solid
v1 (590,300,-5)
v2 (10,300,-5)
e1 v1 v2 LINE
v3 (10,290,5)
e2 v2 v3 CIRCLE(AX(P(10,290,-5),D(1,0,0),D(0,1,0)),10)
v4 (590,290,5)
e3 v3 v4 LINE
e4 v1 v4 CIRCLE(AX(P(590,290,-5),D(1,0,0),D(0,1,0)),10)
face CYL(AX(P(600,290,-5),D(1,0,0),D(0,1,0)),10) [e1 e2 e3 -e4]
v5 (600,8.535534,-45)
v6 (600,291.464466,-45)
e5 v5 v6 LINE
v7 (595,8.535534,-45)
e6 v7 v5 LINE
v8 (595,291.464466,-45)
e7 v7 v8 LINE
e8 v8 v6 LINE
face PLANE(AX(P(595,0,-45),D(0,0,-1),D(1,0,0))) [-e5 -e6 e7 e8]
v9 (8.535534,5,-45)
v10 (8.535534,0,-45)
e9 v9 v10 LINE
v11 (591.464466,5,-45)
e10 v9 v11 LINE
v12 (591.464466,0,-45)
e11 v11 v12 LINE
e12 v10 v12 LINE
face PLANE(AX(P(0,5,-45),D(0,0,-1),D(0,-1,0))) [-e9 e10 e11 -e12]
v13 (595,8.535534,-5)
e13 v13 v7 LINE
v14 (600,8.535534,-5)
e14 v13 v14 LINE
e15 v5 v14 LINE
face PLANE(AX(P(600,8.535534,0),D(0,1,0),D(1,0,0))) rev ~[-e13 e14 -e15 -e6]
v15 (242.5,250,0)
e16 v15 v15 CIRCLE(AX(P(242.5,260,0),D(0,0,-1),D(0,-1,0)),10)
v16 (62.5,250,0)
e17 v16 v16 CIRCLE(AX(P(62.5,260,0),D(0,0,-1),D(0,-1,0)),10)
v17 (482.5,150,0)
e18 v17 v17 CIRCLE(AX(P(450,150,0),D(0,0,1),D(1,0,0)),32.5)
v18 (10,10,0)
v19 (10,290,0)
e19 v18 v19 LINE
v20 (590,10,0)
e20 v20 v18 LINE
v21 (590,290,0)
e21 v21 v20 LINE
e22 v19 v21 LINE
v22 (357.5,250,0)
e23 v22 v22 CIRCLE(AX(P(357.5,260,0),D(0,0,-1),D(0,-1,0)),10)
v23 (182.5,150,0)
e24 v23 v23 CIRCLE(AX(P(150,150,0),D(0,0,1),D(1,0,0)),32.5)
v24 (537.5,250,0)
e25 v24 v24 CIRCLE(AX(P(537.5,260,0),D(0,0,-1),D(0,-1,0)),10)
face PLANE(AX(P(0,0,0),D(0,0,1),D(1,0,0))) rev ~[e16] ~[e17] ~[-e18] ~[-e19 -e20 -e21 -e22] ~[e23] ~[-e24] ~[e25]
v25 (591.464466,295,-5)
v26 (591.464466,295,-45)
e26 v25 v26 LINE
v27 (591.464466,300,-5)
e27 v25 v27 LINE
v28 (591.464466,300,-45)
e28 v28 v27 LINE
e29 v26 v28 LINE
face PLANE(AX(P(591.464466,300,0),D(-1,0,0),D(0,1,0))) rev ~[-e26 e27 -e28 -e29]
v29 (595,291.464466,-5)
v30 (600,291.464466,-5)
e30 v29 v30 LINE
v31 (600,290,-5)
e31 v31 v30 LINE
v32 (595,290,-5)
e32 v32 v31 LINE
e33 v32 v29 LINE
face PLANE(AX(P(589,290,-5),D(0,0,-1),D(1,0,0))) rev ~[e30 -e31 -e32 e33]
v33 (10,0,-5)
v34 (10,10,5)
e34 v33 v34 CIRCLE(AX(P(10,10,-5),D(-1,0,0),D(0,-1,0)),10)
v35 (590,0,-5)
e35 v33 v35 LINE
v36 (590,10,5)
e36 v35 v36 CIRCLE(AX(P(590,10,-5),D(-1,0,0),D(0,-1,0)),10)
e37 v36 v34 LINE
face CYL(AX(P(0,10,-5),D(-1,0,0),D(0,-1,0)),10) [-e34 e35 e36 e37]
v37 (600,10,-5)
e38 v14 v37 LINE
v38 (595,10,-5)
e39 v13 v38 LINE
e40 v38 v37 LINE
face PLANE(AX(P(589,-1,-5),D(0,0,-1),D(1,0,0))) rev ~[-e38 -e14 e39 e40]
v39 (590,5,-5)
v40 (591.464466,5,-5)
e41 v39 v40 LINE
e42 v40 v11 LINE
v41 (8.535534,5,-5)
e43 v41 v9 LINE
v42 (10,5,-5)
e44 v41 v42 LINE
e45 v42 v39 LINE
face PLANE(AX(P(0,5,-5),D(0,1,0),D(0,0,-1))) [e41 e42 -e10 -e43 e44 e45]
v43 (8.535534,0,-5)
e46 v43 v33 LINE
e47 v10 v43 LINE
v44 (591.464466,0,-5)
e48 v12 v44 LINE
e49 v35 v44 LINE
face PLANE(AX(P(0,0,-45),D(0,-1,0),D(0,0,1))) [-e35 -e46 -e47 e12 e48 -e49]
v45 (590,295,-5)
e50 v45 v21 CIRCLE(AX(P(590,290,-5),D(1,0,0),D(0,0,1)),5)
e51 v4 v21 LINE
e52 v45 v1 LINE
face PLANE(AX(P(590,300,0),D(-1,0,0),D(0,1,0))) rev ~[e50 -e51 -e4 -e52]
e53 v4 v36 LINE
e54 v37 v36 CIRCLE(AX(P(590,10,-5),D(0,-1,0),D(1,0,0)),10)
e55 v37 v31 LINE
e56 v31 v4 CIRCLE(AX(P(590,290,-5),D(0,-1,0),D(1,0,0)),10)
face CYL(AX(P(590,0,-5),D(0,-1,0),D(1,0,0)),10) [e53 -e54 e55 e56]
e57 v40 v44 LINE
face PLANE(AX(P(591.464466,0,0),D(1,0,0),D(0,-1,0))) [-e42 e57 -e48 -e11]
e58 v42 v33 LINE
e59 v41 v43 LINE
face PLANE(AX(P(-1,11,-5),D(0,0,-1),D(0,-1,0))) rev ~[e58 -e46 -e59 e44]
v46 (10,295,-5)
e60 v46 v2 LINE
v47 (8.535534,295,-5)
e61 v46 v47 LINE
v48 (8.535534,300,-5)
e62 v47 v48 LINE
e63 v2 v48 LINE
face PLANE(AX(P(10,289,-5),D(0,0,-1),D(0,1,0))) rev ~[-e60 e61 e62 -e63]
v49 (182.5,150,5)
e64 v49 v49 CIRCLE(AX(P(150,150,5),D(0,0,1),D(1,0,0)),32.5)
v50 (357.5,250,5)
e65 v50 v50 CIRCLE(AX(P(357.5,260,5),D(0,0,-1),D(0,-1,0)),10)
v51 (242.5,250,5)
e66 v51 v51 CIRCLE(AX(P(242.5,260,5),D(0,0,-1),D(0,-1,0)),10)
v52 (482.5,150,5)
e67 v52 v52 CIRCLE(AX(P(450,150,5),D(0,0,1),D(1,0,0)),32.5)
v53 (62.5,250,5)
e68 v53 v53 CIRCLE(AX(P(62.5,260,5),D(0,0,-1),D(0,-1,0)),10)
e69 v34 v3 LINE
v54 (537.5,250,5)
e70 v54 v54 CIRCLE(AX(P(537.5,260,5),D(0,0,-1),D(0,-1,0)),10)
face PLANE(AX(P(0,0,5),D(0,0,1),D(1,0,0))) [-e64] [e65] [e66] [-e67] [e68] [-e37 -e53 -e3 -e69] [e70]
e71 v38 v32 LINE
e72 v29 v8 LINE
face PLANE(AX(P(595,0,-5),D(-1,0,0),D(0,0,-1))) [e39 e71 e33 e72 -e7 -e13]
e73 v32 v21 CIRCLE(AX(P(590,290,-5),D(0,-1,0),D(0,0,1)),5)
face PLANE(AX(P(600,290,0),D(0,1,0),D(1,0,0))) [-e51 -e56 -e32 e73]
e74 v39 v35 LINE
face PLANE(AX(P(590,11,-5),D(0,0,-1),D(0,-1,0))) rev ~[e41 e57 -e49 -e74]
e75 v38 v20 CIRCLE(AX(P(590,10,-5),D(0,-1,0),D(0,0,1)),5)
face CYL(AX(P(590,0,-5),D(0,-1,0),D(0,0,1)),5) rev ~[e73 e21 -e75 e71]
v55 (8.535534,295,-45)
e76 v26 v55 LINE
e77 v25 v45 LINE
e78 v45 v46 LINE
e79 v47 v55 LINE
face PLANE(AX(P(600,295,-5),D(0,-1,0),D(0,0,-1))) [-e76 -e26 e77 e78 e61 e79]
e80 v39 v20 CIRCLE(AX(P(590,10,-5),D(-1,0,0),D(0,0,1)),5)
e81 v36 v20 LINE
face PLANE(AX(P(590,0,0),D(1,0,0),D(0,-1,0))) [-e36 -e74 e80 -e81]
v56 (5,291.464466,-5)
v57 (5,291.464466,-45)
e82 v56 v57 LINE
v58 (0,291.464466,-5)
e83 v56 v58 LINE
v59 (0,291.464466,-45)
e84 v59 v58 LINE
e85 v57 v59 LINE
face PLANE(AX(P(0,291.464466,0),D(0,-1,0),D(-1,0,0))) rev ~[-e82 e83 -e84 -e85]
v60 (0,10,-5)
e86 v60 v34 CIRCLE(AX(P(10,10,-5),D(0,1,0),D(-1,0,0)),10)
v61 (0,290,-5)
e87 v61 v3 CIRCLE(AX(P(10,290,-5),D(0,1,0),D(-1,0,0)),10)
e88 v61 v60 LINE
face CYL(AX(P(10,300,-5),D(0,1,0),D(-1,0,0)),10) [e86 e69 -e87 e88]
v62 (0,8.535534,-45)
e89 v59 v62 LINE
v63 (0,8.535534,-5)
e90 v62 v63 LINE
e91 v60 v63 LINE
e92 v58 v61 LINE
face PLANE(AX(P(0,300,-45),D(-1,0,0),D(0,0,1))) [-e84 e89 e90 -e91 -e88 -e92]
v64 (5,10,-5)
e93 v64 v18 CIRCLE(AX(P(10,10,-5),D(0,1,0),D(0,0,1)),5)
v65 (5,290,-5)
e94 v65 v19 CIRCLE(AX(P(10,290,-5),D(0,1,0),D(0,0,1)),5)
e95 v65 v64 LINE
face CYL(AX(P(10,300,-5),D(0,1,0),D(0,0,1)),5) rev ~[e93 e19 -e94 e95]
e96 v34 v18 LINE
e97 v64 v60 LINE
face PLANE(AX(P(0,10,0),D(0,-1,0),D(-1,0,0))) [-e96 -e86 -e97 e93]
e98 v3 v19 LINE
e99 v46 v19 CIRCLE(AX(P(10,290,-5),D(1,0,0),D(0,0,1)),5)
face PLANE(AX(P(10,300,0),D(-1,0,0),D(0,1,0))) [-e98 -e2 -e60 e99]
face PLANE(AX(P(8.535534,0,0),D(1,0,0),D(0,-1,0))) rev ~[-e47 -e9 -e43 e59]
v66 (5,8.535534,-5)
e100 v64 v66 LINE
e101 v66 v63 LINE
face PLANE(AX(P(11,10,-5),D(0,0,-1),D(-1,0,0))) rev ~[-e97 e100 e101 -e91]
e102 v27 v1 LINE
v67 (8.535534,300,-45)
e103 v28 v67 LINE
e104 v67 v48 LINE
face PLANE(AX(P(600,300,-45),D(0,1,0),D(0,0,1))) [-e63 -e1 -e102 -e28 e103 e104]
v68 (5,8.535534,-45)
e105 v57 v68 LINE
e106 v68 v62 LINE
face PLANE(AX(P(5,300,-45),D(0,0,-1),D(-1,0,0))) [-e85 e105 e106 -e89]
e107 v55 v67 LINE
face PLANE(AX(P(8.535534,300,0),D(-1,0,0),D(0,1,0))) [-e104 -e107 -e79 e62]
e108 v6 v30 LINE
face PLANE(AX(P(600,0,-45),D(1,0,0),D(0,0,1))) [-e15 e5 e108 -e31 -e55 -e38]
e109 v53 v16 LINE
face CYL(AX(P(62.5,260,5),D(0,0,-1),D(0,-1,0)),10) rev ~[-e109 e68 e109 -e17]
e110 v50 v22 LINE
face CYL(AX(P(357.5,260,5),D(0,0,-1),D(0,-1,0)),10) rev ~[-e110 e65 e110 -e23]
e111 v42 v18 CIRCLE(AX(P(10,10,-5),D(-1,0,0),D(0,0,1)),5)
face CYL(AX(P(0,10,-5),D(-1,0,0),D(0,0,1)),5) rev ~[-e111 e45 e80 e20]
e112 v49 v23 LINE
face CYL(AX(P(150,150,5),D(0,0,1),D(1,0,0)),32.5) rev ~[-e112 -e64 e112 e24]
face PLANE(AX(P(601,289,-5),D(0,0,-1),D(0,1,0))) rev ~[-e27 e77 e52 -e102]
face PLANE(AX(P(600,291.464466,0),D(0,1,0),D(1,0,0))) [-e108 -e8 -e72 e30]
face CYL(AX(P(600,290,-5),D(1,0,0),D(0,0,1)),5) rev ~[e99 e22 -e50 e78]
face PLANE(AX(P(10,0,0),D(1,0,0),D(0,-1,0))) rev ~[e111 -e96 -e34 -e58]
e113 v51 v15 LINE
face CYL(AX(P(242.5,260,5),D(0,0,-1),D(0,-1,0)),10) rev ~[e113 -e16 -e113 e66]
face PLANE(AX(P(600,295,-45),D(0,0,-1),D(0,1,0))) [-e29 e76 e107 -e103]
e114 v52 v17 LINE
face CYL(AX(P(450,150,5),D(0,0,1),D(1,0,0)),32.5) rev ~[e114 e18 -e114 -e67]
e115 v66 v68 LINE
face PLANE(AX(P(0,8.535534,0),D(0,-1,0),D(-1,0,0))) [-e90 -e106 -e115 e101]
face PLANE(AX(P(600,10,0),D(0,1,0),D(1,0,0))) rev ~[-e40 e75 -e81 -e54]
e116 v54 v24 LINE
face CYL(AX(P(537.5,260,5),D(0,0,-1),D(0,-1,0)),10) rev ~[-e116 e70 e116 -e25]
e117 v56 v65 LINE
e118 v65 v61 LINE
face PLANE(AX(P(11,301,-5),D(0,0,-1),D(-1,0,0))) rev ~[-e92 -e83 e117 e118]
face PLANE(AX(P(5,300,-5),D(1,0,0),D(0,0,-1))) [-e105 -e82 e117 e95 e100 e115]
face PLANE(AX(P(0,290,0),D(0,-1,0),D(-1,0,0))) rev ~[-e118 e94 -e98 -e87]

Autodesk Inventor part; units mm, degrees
ref_plane "YZ Plane" through (0, 0, 0) normal (1, 0, 0) x (0, 1, 0)
ref_plane "XZ Plane" through (0, 0, 0) normal (0, 1, 0) x (-1, 0, 0)
ref_plane "XY Plane" through (0, 0, 0) normal (0, 0, 1) x (1, 0, 0)
sketch "Sketch1" plane through (0, 0, 0) normal (0, 0, 1) x (1, 0, 0)
  line L0 (0, 0) -> (600, 0)
  line L1 (600, 0) -> (600, 300)
  line L2 (600, 300) -> (0, 300)
  line L3 (0, 300) -> (0, 0)
  dimension "d0" = 300
  dimension "d1" = 600
extrude "Plate1" add sketch "Sketch1" along normal blind 5
sketch "Sketch2" plane through (595, 0, 5) normal (1, 0, 0) x (0, 1, 0)
  line L0 (300, 0) -> (0, 0)
  line L1 (0, 0) -> (0, -50)
  line L2 (0, -50) -> (300, -50)
  line L3 (300, -50) -> (300, 0)
edge flange "Flange1" height 50 angle 90 thickness 5 bend radius 5 thickness toward (1, 0, 0) relief tear relief width 5 relief depth 2.5 corner gap 5 corner form 2 edges at (600, 150, 0) (0, 150, 0) (300, 0, 0) (300, 300, 0) wall of the first edge with corners at (595, 300, 5) (595, 0, 5) (595, 0, -45) (595, 300, -45)
bend "Bend1"
corner "Corner1"
sketch "Sketch3" plane through (0, 0, 5) normal (0, 0, 1) x (1, 0, 0)
  circle A0 centre (150, 150) radius 32.5
  circle A1 centre (450, 150) radius 32.5
  point P0 (0, 0)
  dimension "d13" = 65
  dimension "d14" = 65
extrude "Extrusion1" cut sketch "Sketch3" against normal blind 10
sketch "Sketch4" plane through (0, 0, 5) normal (0, 0, 1) x (1, 0, 0)
  circle A0 centre (62.5, 260) radius 10 projected
  circle A1 centre (242.5, 260) radius 10 projected
  circle A2 centre (357.5, 260) radius 10 projected
  circle A3 centre (537.5, 260) radius 10 projected
  line L0 (22.5, 236) -> (577.5, 236) projected
  line L1 (577.5, 304) -> (577.5, 236) projected
  line L2 (22.5, 304) -> (22.5, 236) projected
  line L3 (577.5, 304) -> (22.5, 304) projected
  point P0 (0, 0)
hole "Hole1" at (537.5, 260, 5) at (357.5, 260, 5) at (242.5, 260, 5) at (62.5, 260, 5) direction (0, 0, -1) diameter 20 depth 5 tip angle 118
equation "\"d22\" = Thickness"
equation "\"d3\" = BendReliefWidth"
equation "\"d4\" = BendReliefDepth"
equation "\"d5\" = MinimumRemnant"
equation "\"d6\" = BendRadius"
equation "\"d9\" = BendRadius"
equation "\"d10\" = CornerReliefSize"
equation "\"d11\" = GapSize"
equation "\"d12\" = JacobiRadiusSize"
equation "\"BendRadius\" = Thickness"
equation "\"BendReliefWidth\" = Thickness"
equation "\"BendReliefDepth\" = 0.5 * Thickness"
equation "\"TransitionRadius\" = BendRadius"
equation "\"JacobiRadiusSize\" = BendRadius"
equation "\"GapSize\" = Thickness"
equation "\"d2\" = BendRadius"
equation "\"Thickness\" = 5"
equation "\"MinimumRemnant\" = 10"
equation "\"CornerReliefSize\" = 20"
properties part number "Side Plate"
